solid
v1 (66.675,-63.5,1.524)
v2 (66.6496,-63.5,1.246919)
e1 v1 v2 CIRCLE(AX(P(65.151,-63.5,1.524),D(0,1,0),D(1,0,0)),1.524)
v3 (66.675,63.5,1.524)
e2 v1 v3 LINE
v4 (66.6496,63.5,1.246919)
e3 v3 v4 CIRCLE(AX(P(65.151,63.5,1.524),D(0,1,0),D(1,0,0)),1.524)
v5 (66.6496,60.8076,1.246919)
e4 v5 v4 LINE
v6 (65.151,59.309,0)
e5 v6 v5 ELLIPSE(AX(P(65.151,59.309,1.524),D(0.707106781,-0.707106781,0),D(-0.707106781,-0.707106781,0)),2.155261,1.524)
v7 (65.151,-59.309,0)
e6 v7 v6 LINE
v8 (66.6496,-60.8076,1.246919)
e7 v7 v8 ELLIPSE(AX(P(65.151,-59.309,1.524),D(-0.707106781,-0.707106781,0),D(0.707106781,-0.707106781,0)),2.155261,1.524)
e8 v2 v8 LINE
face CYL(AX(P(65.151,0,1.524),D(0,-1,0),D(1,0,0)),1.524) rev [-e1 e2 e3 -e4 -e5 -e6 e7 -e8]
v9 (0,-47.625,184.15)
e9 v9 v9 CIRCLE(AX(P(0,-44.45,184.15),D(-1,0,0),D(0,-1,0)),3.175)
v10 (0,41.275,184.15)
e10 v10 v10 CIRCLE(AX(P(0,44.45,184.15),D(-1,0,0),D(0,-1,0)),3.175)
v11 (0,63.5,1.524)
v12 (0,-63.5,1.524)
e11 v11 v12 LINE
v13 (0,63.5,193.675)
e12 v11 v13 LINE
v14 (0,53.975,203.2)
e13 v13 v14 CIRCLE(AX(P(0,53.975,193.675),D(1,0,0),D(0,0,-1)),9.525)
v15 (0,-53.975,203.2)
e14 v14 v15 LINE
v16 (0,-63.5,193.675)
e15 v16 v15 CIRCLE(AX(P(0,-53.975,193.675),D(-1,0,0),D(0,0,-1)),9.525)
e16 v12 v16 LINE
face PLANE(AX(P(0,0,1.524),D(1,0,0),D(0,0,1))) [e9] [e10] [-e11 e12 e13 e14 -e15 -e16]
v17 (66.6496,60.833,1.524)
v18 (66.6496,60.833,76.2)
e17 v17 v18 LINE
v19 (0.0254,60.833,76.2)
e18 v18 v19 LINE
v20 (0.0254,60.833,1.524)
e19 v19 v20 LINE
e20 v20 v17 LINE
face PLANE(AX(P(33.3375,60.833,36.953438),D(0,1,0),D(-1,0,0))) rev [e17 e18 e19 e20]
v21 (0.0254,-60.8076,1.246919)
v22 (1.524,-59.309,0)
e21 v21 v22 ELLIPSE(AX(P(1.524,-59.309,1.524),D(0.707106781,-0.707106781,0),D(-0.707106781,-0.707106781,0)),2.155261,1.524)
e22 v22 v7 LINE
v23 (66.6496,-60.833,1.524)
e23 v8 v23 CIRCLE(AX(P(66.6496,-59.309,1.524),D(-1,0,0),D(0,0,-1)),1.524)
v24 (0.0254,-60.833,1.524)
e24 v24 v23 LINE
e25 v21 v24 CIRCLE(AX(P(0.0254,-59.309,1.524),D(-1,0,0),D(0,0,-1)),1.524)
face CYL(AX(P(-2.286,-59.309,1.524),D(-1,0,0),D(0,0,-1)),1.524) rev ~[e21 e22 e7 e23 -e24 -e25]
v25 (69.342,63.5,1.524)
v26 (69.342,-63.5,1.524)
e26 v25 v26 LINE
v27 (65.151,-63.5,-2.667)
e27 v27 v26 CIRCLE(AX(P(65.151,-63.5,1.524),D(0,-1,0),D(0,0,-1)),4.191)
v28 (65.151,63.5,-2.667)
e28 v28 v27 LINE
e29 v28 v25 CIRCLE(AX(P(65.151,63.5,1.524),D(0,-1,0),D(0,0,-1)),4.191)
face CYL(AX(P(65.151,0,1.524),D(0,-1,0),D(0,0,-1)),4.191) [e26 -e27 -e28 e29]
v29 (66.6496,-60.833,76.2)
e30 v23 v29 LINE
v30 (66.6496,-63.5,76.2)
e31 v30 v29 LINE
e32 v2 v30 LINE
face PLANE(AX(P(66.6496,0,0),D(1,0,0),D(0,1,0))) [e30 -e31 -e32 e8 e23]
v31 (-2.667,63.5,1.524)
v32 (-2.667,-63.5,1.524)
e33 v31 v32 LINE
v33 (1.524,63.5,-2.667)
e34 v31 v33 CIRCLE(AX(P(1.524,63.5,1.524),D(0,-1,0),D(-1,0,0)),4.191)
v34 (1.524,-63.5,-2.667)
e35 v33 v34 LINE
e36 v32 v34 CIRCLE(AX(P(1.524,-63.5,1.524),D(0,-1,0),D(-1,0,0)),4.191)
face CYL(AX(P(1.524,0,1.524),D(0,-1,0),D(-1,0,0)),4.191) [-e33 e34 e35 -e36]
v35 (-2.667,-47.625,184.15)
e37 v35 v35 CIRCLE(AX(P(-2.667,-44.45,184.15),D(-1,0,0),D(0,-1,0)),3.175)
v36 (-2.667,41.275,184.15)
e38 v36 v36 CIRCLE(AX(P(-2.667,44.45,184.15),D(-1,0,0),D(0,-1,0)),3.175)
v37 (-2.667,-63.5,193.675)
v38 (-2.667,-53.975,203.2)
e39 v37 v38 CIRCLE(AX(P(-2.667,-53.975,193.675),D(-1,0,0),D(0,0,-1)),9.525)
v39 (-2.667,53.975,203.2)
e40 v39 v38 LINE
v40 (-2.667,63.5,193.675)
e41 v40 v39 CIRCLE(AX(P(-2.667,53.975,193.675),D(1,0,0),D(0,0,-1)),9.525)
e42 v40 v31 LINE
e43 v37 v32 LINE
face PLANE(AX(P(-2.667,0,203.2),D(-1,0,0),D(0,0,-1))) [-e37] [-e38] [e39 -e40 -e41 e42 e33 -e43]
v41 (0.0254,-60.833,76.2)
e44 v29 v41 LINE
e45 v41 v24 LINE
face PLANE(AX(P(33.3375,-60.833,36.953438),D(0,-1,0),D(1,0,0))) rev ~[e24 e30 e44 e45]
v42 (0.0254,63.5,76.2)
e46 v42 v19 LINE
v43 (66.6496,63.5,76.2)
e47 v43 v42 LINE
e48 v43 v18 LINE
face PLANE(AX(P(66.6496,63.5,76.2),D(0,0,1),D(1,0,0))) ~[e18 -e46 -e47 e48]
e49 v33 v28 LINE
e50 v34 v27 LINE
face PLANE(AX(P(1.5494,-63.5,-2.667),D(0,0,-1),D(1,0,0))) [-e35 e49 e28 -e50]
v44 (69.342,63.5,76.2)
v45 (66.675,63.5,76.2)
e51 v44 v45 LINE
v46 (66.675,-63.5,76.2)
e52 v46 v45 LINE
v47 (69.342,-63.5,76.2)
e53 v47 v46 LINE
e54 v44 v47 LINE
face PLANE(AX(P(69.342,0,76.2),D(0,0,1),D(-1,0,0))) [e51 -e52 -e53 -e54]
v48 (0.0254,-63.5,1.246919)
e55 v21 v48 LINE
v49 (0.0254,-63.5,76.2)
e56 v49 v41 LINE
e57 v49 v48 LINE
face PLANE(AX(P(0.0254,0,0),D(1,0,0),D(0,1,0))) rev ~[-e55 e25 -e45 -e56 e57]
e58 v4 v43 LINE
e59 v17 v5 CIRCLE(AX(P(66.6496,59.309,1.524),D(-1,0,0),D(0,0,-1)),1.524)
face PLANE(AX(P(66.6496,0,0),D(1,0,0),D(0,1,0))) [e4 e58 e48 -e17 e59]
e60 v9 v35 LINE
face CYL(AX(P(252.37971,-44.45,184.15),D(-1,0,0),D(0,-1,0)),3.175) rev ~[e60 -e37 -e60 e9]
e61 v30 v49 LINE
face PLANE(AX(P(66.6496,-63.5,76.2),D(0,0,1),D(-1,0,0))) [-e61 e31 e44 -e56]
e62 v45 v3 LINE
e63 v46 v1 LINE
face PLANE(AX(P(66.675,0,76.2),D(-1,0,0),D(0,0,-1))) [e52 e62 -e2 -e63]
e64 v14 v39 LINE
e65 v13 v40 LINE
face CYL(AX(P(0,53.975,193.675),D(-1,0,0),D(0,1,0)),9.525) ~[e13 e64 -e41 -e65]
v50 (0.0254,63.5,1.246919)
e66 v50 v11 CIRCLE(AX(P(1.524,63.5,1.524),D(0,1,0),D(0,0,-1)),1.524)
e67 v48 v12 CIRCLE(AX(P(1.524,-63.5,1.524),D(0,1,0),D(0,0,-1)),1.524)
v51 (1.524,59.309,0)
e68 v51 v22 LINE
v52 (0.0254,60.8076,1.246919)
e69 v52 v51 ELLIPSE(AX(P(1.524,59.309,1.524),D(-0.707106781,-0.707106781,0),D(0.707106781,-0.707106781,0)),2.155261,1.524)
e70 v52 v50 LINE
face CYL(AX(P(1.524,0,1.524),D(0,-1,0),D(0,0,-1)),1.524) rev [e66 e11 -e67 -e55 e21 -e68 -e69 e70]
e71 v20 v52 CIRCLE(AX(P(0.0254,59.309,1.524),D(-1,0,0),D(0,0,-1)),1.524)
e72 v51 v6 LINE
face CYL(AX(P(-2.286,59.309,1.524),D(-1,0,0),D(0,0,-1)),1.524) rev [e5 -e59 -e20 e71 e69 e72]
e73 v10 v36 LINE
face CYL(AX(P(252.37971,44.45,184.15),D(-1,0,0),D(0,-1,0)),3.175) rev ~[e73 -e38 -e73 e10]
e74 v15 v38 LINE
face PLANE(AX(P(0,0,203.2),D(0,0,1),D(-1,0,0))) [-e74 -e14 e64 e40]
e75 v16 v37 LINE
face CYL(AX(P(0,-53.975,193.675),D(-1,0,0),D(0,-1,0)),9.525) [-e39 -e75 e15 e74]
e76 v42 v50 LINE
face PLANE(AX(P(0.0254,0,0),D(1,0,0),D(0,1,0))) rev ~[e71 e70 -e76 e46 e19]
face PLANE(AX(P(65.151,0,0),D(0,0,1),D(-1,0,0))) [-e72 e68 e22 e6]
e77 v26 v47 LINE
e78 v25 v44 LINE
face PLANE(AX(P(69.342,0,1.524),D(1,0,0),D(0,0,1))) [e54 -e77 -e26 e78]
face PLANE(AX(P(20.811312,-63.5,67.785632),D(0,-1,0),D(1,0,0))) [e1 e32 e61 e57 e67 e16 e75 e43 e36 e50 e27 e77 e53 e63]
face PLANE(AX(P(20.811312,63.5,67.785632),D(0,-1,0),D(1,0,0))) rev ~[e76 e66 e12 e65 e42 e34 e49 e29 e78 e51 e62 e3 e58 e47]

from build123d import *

# Parameters (mm, degrees)
F1_DEPTH    = 63.5
F3_DEPTH    = 2.667
F5_T4_DEPTH = 71.247
F6_T4_DEPTH = 71.247
F8_D        = 6.35
F9_R        = 9.525


# Not quite as in the source:
# - a fillet or chamfer that OpenCascade refuses, or shapes differently, is made with other operations: its cross-section is extruded or revolved along the edge and cut away or added
# - a feature of the source that left no trace in its solid (it failed there, or was rolled back) is left out


with BuildPart() as f1:
    # F0 (on Front) → F1 (new body, symmetric)
    with BuildSketch(Plane.XZ):
        with BuildLine():
            Line((65.151, 0), (1.524, 0))
            ThreePointArc((1.524, 0), (0.4463692655, 0.4463692655), (0, 1.524))
            Line((0, 1.524), (0, 76.2))
            Line((0, 76.2), (0, 203.2))
            Line((0, 203.2), (-2.667, 203.2))
            Line((-2.667, 203.2), (-2.667, 76.2))
            Line((-2.667, 76.2), (-2.667, 1.524))
            ThreePointArc((-2.667, 1.524), (-1.43948452, -1.43948452), (1.524, -2.667))
            Line((1.524, -2.667), (65.151, -2.667))
            ThreePointArc((65.151, -2.667), (68.11448452, -1.43948452), (69.342, 1.524))
            Line((69.342, 1.524), (69.342, 76.2))
            Line((69.342, 76.2), (66.675, 76.2))
            Line((66.675, 76.2), (66.675, 1.524))
            ThreePointArc((66.675, 1.524), (66.2286307345, 0.4463692655), (65.151, 0))
        make_face()
    extrude(amount=F1_DEPTH, both=True)

    # F2 (on face) → F3 (join)
    with BuildSketch(Plane.XZ.offset(63.5)):
        with BuildLine():
            Line((66.6496, -1.143), (66.6496, 76.2))
            Line((66.6496, 76.2), (0.0254, 76.2))
            Line((0.0254, 76.2), (0.0254, -1.143))
            ThreePointArc((0.0254, -1.143), (0.4717692655, -2.2206307345), (1.5494, -2.667))
            Line((1.5494, -2.667), (65.1256, -2.667))
            ThreePointArc((65.1256, -2.667), (66.2032307345, -2.2206307345), (66.6496, -1.143))
        make_face()
    extrude(amount=-F3_DEPTH)

    # F4: F1 across plane


with BuildPart() as f1_1:
    add(f1.part)
    add(f1.part.mirror(Plane.XZ))

    # F5: fillet of radius 1.524 on 1 edges, made by hand


with BuildPart() as f5_tool2:
    # F5_s3 → F5_t4 (new body)
    with BuildSketch(Plane.YZ.offset(-2.286)):
        with BuildLine():
            ThreePointArc((-59.309, 0), (-60.3866307345, 0.4463692655), (-60.833, 1.524))
            Line((-60.833, 1.524), (-60.833, 0))
            Line((-60.833, 0), (-59.309, 0))
        make_face()
    extrude(amount=F5_T4_DEPTH)

    split(bisect_by=Plane.YZ.offset(0.0254), keep=Keep.TOP)

    split(bisect_by=Plane.YZ.offset(66.6496), keep=Keep.BOTTOM)


with BuildPart() as f1_2:
    add(f1_1.part)

    # F5_t1: union F5_tool2
    add(f5_tool2.part)

    # F6: fillet of radius 1.524 on 1 edges, made by hand


with BuildPart() as f6_tool2:
    # F6_s3 → F6_t4 (new body)
    with BuildSketch(Plane.YZ.offset(-2.286)):
        with BuildLine():
            ThreePointArc((59.309, 0), (60.3866307345, 0.4463692655), (60.833, 1.524))
            Line((60.833, 1.524), (60.833, 0))
            Line((60.833, 0), (59.309, 0))
        make_face()
    extrude(amount=F6_T4_DEPTH)

    split(bisect_by=Plane.YZ.offset(0.0254), keep=Keep.TOP)

    split(bisect_by=Plane.YZ.offset(66.6496), keep=Keep.BOTTOM)


with BuildPart() as f1_3:
    add(f1_2.part)

    # F6_t1: union F6_tool2
    add(f6_tool2.part)

    # F8 (through all)
    with Locations(Plane.YZ):
        with Locations((-44.45, 184.15), (44.45, 184.15)):
            Hole(F8_D / 2)

    # F9
    f9_edges = [f1_3.edges().sort_by_distance(p)[0] for p in [
        (-1.3335, -63.5, 203.2),
        (-1.3335, 63.5, 203.2),
    ]]
    fillet(f9_edges, radius=F9_R)


solid = f1_3.part
